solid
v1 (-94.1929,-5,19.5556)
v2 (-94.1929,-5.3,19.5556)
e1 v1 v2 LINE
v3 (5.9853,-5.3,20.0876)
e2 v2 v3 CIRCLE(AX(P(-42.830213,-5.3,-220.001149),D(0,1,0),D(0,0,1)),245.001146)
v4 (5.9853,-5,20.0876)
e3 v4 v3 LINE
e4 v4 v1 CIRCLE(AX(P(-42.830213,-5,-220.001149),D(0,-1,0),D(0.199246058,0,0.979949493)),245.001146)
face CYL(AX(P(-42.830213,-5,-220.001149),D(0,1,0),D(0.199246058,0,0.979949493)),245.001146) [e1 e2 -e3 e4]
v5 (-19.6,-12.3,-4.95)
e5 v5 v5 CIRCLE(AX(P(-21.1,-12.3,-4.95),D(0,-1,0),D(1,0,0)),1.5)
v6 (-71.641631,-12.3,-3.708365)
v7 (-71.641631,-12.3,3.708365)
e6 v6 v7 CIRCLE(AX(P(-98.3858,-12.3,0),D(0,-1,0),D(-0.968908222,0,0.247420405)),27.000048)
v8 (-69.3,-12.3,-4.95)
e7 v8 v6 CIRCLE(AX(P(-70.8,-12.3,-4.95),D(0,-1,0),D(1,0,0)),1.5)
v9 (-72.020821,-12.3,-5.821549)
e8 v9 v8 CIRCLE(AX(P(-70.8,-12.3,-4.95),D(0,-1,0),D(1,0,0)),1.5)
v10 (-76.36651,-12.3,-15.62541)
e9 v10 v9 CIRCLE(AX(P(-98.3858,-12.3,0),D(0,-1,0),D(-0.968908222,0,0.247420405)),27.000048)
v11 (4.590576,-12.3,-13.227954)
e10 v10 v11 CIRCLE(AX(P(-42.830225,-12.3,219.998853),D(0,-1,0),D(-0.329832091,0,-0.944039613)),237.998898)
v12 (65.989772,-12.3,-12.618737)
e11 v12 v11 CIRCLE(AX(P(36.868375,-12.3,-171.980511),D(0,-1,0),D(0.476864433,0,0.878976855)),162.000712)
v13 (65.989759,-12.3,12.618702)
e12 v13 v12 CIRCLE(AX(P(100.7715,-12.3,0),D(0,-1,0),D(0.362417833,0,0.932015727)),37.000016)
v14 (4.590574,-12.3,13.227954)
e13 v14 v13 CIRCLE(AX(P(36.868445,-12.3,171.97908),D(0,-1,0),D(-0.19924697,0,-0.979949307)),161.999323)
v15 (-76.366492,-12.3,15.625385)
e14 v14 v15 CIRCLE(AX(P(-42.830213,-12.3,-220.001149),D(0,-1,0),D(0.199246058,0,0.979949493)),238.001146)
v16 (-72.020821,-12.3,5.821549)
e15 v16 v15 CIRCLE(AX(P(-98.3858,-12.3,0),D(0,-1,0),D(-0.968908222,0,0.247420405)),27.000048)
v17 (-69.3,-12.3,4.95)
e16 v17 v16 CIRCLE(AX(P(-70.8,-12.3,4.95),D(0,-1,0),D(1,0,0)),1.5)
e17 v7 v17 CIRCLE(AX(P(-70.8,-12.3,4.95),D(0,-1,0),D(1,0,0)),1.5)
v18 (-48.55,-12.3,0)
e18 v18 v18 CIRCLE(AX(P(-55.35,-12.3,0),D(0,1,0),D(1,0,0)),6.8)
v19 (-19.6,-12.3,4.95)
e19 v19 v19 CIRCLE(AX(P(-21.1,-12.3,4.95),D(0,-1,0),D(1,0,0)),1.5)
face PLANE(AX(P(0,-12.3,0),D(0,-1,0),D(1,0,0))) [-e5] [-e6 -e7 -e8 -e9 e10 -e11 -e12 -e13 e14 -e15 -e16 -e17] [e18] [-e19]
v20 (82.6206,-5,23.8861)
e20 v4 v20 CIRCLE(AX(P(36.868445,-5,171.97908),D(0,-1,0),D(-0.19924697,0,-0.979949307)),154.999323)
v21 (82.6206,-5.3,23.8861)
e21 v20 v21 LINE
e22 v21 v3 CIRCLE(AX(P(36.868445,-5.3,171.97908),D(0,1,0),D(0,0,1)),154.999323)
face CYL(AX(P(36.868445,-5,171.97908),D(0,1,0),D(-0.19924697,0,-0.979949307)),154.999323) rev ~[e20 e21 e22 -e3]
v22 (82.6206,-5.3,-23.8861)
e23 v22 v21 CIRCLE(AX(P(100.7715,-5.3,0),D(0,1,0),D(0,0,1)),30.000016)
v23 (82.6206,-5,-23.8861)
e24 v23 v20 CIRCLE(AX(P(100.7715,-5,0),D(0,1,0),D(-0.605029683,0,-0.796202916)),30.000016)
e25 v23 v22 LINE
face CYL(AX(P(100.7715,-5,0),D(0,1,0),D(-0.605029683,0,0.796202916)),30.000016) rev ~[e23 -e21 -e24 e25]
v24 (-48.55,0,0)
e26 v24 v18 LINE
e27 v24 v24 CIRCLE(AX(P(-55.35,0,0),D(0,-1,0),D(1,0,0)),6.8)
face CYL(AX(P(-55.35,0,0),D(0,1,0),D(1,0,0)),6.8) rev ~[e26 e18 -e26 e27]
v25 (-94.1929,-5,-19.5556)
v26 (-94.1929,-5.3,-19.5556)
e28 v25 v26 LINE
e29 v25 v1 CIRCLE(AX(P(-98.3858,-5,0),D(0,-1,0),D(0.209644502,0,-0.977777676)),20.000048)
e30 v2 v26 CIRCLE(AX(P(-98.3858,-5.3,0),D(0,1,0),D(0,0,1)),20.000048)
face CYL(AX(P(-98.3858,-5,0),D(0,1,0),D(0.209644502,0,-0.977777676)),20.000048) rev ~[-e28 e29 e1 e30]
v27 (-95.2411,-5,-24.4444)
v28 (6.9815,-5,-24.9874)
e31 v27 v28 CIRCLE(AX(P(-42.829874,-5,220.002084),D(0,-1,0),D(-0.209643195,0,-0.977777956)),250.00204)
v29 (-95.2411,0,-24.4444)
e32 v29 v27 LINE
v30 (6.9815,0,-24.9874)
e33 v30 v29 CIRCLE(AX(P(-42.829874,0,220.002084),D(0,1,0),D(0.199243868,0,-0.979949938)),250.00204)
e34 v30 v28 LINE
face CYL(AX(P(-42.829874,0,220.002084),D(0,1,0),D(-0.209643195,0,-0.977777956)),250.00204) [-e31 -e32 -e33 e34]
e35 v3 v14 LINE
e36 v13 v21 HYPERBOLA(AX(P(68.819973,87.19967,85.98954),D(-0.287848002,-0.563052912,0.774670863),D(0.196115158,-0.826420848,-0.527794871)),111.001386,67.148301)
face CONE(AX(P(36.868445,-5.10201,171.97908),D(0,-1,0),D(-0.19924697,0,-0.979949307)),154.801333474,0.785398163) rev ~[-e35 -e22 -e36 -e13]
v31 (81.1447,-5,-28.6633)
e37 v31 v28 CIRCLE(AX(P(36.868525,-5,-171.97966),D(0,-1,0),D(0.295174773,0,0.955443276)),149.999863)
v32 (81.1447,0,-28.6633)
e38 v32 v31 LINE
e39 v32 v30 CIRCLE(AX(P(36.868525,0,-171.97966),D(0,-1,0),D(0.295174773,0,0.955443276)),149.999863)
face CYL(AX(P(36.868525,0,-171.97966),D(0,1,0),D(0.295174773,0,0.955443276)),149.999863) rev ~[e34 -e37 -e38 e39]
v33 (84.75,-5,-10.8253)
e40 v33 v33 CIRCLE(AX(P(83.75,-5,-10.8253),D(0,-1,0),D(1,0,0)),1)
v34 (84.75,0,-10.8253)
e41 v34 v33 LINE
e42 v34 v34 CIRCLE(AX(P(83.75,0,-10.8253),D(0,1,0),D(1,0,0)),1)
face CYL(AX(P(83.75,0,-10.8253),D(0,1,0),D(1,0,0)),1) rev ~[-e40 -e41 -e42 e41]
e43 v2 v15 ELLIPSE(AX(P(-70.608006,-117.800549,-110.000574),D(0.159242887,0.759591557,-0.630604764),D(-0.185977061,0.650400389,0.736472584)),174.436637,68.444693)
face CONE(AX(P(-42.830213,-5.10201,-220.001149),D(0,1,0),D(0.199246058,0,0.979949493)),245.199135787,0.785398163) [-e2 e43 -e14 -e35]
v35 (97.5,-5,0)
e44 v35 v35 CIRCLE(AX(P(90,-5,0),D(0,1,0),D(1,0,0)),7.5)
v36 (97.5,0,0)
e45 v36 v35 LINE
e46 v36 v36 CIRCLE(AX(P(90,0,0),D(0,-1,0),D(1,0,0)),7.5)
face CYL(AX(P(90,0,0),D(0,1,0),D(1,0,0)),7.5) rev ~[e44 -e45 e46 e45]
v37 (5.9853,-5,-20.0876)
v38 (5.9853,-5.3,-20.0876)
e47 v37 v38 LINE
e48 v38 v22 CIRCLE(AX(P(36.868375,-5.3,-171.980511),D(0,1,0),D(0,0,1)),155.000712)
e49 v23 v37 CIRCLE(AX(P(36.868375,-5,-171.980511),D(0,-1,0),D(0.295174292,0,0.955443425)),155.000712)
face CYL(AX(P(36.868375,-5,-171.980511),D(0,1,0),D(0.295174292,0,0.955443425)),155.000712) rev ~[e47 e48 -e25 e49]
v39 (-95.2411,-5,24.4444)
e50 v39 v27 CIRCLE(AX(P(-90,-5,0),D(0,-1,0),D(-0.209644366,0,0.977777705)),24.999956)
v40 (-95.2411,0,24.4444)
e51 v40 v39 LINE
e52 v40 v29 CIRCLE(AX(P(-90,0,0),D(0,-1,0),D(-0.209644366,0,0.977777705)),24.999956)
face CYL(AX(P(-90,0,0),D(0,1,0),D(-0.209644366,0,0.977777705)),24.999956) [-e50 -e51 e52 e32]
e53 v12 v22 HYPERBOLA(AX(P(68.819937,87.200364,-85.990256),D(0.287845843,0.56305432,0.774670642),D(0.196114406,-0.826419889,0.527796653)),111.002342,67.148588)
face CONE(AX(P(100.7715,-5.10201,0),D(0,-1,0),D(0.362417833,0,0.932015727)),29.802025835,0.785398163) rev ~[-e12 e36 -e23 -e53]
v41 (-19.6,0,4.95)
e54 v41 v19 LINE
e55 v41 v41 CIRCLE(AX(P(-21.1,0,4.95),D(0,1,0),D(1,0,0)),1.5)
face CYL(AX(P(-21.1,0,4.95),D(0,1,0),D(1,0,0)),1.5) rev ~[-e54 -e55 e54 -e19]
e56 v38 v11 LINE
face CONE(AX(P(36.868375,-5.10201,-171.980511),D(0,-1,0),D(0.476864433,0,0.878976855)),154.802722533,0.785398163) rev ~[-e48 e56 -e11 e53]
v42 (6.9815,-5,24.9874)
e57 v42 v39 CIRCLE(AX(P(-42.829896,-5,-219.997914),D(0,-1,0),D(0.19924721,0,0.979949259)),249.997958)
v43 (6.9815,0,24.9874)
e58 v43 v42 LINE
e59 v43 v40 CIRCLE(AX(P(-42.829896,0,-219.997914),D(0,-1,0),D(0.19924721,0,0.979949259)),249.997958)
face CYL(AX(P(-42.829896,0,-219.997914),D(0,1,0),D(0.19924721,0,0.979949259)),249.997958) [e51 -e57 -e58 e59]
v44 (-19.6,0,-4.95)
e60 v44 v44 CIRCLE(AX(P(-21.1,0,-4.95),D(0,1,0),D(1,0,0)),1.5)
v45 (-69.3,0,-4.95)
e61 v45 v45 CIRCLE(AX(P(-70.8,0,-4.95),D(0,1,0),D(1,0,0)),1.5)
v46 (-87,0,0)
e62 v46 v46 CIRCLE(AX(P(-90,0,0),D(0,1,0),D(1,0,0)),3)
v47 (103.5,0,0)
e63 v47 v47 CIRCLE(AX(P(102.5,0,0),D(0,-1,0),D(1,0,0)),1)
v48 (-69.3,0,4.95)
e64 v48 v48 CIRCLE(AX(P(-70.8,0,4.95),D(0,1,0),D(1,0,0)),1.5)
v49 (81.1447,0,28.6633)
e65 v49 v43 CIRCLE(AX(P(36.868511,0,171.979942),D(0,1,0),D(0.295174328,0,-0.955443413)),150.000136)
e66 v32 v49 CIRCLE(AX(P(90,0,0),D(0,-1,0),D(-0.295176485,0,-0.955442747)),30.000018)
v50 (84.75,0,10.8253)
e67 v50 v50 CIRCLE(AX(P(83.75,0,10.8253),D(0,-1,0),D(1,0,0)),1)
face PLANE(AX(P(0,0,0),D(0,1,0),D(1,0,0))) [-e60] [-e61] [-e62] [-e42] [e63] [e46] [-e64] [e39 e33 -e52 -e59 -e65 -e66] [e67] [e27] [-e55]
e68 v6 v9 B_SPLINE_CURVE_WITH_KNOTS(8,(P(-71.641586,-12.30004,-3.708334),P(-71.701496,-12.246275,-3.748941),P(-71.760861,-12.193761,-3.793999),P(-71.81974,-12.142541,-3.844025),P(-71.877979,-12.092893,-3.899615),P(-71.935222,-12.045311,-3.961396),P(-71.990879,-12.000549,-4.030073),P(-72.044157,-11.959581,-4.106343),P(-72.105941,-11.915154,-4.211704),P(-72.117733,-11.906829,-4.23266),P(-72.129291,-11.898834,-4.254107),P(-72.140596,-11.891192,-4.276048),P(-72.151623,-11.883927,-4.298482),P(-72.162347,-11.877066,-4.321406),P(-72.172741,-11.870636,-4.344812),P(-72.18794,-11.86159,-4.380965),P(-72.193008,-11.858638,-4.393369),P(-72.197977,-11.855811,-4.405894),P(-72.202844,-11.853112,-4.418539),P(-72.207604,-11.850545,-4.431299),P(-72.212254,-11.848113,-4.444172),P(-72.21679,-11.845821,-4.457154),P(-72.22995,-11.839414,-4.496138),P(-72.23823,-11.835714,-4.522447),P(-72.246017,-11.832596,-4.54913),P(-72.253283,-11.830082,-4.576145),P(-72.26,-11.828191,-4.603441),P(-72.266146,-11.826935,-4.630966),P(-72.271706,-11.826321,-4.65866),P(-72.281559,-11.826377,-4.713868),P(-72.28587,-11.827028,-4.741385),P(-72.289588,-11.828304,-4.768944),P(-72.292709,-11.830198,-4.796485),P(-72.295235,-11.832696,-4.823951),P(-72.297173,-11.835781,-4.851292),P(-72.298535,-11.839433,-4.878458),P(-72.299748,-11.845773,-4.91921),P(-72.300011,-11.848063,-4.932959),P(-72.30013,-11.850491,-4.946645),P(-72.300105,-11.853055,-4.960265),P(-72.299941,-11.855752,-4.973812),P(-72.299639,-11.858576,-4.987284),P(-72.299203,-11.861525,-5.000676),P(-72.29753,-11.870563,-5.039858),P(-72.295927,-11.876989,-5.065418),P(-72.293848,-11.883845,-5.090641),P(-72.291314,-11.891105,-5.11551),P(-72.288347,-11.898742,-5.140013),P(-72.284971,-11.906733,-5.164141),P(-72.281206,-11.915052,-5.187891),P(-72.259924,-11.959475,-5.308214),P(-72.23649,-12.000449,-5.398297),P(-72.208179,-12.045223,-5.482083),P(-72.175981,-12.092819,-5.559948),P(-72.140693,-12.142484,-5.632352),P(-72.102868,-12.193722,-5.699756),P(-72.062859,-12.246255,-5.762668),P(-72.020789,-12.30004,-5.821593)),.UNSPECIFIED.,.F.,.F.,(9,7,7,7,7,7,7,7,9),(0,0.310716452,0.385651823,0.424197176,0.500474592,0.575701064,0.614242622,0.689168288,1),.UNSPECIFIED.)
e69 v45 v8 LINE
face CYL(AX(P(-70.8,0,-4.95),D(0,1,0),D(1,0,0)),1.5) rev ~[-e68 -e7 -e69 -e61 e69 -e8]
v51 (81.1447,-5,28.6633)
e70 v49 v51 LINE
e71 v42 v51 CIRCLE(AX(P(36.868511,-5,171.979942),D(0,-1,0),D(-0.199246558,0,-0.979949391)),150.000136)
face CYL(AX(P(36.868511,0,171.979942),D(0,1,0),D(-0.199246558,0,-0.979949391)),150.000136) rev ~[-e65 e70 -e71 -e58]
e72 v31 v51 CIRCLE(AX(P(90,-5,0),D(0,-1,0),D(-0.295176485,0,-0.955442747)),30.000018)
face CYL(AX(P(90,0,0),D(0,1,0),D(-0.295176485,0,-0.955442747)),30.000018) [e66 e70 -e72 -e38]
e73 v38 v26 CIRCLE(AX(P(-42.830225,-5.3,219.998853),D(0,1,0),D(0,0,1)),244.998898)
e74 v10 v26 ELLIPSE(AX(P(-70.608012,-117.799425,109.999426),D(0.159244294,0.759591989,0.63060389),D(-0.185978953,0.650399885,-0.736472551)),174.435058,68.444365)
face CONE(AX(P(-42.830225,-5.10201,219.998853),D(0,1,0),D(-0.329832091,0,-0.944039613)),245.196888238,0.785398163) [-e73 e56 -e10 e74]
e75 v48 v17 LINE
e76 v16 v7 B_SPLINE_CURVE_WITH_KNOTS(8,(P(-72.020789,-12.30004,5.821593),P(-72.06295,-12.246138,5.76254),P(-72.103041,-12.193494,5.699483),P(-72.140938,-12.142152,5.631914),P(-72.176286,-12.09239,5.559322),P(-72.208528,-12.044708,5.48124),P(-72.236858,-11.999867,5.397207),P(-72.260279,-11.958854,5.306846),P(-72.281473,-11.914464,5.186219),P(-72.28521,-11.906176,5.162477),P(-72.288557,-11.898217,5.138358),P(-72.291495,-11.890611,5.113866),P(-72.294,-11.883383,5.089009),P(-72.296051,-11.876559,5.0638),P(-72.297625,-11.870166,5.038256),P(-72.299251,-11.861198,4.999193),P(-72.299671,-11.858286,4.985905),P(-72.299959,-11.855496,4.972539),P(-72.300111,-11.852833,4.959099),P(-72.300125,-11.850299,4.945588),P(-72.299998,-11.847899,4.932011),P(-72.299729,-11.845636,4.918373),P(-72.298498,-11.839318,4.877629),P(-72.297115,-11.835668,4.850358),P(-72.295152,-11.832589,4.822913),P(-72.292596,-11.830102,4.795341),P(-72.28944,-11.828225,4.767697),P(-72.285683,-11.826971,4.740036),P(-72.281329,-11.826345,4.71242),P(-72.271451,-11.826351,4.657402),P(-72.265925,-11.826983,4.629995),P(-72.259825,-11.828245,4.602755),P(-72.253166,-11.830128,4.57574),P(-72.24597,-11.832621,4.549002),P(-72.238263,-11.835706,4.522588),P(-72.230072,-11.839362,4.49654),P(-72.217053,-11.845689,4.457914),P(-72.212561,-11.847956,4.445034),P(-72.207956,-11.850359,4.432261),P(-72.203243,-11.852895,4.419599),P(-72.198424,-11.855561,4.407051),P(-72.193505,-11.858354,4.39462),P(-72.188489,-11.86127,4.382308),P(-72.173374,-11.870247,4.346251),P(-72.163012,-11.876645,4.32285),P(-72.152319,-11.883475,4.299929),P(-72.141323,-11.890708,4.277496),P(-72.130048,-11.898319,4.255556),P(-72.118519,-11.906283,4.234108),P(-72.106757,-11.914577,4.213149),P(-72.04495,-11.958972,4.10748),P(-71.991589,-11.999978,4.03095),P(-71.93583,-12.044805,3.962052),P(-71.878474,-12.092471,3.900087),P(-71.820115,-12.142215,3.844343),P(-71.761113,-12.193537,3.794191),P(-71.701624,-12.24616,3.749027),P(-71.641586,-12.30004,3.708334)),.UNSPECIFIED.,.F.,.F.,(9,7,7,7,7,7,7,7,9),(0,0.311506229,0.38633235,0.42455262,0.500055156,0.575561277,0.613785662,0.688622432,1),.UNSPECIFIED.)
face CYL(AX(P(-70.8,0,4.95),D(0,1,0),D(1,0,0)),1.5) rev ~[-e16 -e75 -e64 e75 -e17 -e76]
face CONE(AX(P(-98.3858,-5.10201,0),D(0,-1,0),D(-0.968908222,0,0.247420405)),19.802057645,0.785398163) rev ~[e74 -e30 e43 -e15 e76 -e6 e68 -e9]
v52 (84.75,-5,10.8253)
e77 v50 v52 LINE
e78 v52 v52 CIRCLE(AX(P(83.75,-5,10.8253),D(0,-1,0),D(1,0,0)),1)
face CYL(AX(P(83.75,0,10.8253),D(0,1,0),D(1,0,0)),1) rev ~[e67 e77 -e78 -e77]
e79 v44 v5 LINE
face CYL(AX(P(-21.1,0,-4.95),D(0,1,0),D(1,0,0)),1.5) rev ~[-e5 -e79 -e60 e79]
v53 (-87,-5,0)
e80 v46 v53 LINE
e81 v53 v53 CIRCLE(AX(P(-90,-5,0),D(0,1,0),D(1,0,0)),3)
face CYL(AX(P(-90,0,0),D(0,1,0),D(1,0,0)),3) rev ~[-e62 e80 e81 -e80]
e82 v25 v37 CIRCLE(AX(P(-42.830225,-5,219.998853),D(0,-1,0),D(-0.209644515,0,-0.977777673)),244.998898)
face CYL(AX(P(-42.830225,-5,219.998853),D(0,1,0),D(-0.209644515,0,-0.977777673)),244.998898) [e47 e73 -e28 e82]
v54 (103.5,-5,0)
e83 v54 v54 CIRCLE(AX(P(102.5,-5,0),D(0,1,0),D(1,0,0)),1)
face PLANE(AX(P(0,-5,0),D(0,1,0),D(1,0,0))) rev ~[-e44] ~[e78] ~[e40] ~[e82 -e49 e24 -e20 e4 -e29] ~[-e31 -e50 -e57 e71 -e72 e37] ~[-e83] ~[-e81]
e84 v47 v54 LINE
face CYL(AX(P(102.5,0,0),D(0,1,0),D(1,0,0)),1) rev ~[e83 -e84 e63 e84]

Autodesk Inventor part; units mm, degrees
ref_plane "YZ Plane" through (0, 0, 0) normal (1, 0, 0) x (0, 1, 0)
ref_plane "XZ Plane" through (0, 0, 0) normal (0, 1, 0) x (-1, 0, 0)
ref_plane "XY Plane" through (0, 0, 0) normal (0, 0, 1) x (1, 0, 0)
sketch "Sketch1" plane through (0, 0, 0) normal (0, 1, 0) x (-1, 0, 0)
  line L0 (-90, -25) -> (90, -25)
  line L1 (90, -25) -> (90, 25)
  line L2 (90, 25) -> (-90, 25)
  line L3 (-90, 25) -> (-90, -25)
  line L4 (-90, -25) -> (90, 25) construction
  line L5 (90, -25) -> (-90, 25) construction
  circle A0 centre (90, 0) radius 25
  circle A1 centre (-90, 0) radius 25
  point P0 (0, 0)
  dimension "d0" = 180
  dimension "d1" = 50
extrude "Extrusion1" add sketch "Sketch1" along normal blind 5
sketch "Sketch2" plane through (0, 5, 0) normal (0, 1, 0) x (1, 0, 0)
  arc A0 (90, -25) -> (90, 25) centre (90, 0) ccw projected
  arc A1 (-90, 25) -> (-90, -25) centre (-90, 0) ccw projected
  circle A2 centre (-90, 0) radius 7.5
  circle A3 centre (90, 0) radius 7.5
  point P0 (0, 0)
  dimension "d4" = 15
  dimension "d5" = 15
extrude "Extrusion2" cut sketch "Sketch2" against normal blind 5
sketch "Sketch3" plane through (0, 0, 0) normal (0, -1, 0) x (1, 0, 0)
  line L0 (-90, 25) -> (90, 25) projected
  arc A0 (-90, 25) -> (-90, -25) centre (-90, 0) ccw projected
  line L1 (-90, 0) -> (-55.35, 0)
  circle A1 centre (-55.35, 0) radius 17.325
  line L2 (-55.35, 0) -> (-73.45, 0)
  line L3 (-73.45, 0) -> (-18.45, 0)
  line L4 (-18.45, 10) -> (-73.45, 10)
  line L5 (-73.45, 10) -> (-73.45, -10)
  line L6 (-73.45, -10) -> (-18.45, -10)
  line L7 (-18.45, -10) -> (-18.45, 10)
  line L8 (-18.45, 10) -> (-73.45, -10) construction
  line L9 (-73.45, 10) -> (-18.45, -10) construction
  line L10 (-25.85, -10) -> (-25.85, 10)
  line L11 (-25.85, 10) -> (-66.05, -10) construction
  line L12 (-66.05, 10) -> (-25.85, -10) construction
  line L13 (-70.8, 4.95) -> (-70.8, -4.95)
  line L14 (-70.8, -4.95) -> (-61.3, -4.95)
  line L15 (-61.3, -4.95) -> (-61.3, 4.95)
  line L16 (-61.3, 4.95) -> (-70.8, -4.95) construction
  line L17 (-70.8, 4.95) -> (-61.3, -4.95) construction
  line L18 (-21.1, 4.95) -> (-30.6, 4.95)
  line L19 (-30.6, 4.95) -> (-30.6, -4.95)
  line L20 (-30.6, -4.95) -> (-21.1, -4.95)
  line L21 (-21.1, -4.95) -> (-21.1, 4.95)
  line L22 (-21.1, 4.95) -> (-30.6, -4.95) construction
  line L23 (-30.6, 4.95) -> (-21.1, -4.95) construction
  circle A2 centre (-70.8, 4.95) radius 1.5
  circle A3 centre (-70.8, -4.95) radius 1.5
  circle A4 centre (-21.1, -4.95) radius 1.5
  circle A5 centre (-21.1, 4.95) radius 1.5
  circle A6 centre (-55.35, 0) radius 6.8
  point P0 (0, 0)
  point P1 (-45.95, 0)
  point P2 (-45.95, 0)
  point P3 (-66.05, 0)
  point P4 (-25.85, 0)
  dimension "d9" = 34.65
  dimension "d10" = 18.1
  dimension "d11" = 55
  dimension "d12" = 20
  dimension "d13" = 40.2
  dimension "d14" = 9.5
  dimension "d15" = 9.9
  dimension "d16" = 9.5
  dimension "d17" = 9.9
  dimension "d18" = 3
  dimension "d19" = 3
  dimension "d20" = 3
  dimension "d21" = 3
  dimension "d22" = 13.6
extrude "Extrusion3" cut sketch "Sketch3" against normal blind 5 contours A2 A1 | A1 A2 | A3 L13 L14 A1 | A1 A3 | A6 L15 L1 | L1 L15 A6 | A3 L14 L13 | L15 A6 L3 L1 | L1 L3 A6 L15 | A5 L21 L18 | L18 L21 A5 | A4 L21 L20 | L20 L21 A4
sketch "Sketch4" plane through (0, 0, 0) normal (0, -1, 0) x (1, 0, 0)
  circle A0 centre (90, 0) radius 7.5 projected
  arc A1 (90, -25) -> (90, 25) centre (90, 0) ccw projected
  line L0 (-90, 25) -> (90, 25) projected
  circle A2 centre (90, 0) radius 17.5
  line L1 (82.5, 0) -> (72.5, 0)
  line L2 (97.5, 0) -> (107.5, 0)
  circle A3 centre (102.5, 0) radius 1
  line L3 (90, 0) -> (107.5, 0) construction
  line L4 (90, 0) -> (81.25, -15.1554)
  line L5 (90, 0) -> (107.5, 0) construction
  circle A4 centre (83.75, 10.8253) radius 1
  circle A5 centre (83.75, -10.8253) radius 1
  point P0 (0, 0)
  dimension "d26" = 2
  dimension "d29" = 2
  dimension "d30" = 2
extrude "Extrusion4" cut sketch "Sketch4" against normal blind 5 contours A3 L2 | L2 A3 | A5 L4 | L4 A5 | A4
sketch "Sketch5" plane through (0, 0, 0) normal (0, -1, 0) x (1, 0, 0)
  circle A0 centre (83.75, 10.8253) radius 1 projected
  circle A1 centre (102.5, 0) radius 1 projected
  circle A2 centre (83.75, -10.8253) radius 1 projected
  circle A3 centre (-21.1, 4.95) radius 1.5 projected
  circle A4 centre (-70.8, -4.95) radius 1.5 projected
  circle A5 centre (-55.35, 0) radius 6.8 projected
  circle A6 centre (-70.8, 4.95) radius 1.5 projected
  circle A7 centre (-21.1, -4.95) radius 1.5 projected
  circle A8 centre (-90, 0) radius 7.5 projected
  circle A9 centre (90, 0) radius 7.5 projected
  line L0 (-55.35, 0) -> (0, 0)
  arc A10 (6.9815, 24.9874) -> (-95.2411, 24.4444) centre (-42.8301, -220) ccw
  arc A11 (6.9815, 24.9874) -> (81.1447, 28.6633) centre (36.8685, 171.9798) ccw
  line L1 (-115, 0) -> (115, 0)
  arc A12 (-95.2411, -24.4444) -> (6.9815, -24.9874) centre (-42.8301, 220) ccw
  arc A13 (81.1447, -28.6633) -> (6.9815, -24.9874) centre (36.8685, -171.9798) ccw
  arc A14 (-95.2411, 24.4444) -> (-95.2411, -24.4444) centre (-90, 0) ccw
  arc A15 (81.1447, -28.6633) -> (81.1447, 28.6633) centre (90, 0) ccw construction
  arc A16 (-95.2411, 24.4444) -> (-95.2411, -24.4444) centre (-90, 0) ccw
  arc A17 (81.1447, -28.6633) -> (81.1447, 28.6633) centre (90, 0) ccw
extrude "Extrusion5" add sketch "Sketch5" along normal blind 5
sketch "Sketch6" plane through (0, 5, 0) normal (0, 1, 0) x (1, 0, 0)
  circle A0 centre (83.75, -10.8253) radius 1 projected
  circle A1 centre (102.5, 0) radius 1 projected
  circle A2 centre (83.75, 10.8253) radius 1 projected
  circle A3 centre (-21.1, -4.95) radius 1.5 projected
  circle A4 centre (-70.8, 4.95) radius 1.5 projected
  circle A5 centre (-55.35, 0) radius 6.8 projected
  circle A6 centre (-70.8, -4.95) radius 1.5 projected
  circle A7 centre (-21.1, 4.95) radius 1.5 projected
  circle A8 centre (-90, 0) radius 7.5 projected
  circle A9 centre (90, 0) radius 7.5 projected
  line L0 (-90, -25) -> (90, -25) projected
  arc A10 (90, -25) -> (90, 25) centre (90, 0) ccw projected
  line L1 (90, 25) -> (-90, 25) projected
  arc A11 (-90, 25) -> (-90, -25) centre (-90, 0) ccw projected
  point P0 (0, 0)
extrude "Extrusion6" cut sketch "Sketch6" against normal blind 5
sketch "Sketch8" plane through (0, -5, 0) normal (0, -1, 0) x (1, 0, 0)
  circle A0 centre (-55.35, 0) radius 6.8 projected
  circle A1 centre (-21.1, -4.95) radius 1.5 projected
  circle A2 centre (-70.8, 4.95) radius 1.5 projected
  circle A3 centre (-70.8, -4.95) radius 1.5 projected
  circle A4 centre (-21.1, 4.95) radius 1.5 projected
  arc A5 (-95.2411, 24.4444) -> (-95.2411, -24.4444) centre (-90, 0) ccw projected
  arc A6 (81.1447, -28.6633) -> (81.1447, 28.6633) centre (90, 0) ccw projected
  arc A7 (5.9853, 20.0876) -> (-94.1929, 19.5556) centre (-42.8301, -220) ccw
  arc A8 (5.9853, 20.0876) -> (82.6206, 23.8861) centre (36.8685, 171.9798) ccw
  line L0 (-90, 0) -> (90, 0)
  arc A9 (-94.1929, -19.5556) -> (5.9853, -20.0876) centre (-42.8301, 220) ccw
  arc A10 (82.6206, -23.8861) -> (5.9853, -20.0876) centre (36.8685, -171.9798) ccw
  arc A11 (-94.1929, -19.5556) -> (-94.1929, 19.5556) centre (-98.3858, 0) ccw
  arc A12 (82.6206, 23.8861) -> (82.6206, -23.8861) centre (100.7715, 0) ccw
  point P0 (0, 0)
  dimension "d72" = 20
  dimension "d73" = 30
extrude "Extrusion7" add sketch "Sketch8" along normal blind 7.3 contours L0 A12 A10 A9 A11 A0 | A0 L0 A11 A7 A8 A12
sketch "Sketch14" plane through (0, 0, 0) normal (0, 1, 0) x (1, 0, 0)
  circle A0 centre (-90, 0) radius 7.5 projected
  arc A1 (-95.2411, 24.4444) -> (-95.2411, -24.4444) centre (-90, 0) ccw projected
  circle A2 centre (-90, 0) radius 3
  point P0 (0, 0)
  dimension "d103" = 6
extrude "Extrusion13" add sketch "Sketch14" against normal blind 5
chamfer "Chamfer2" distance 7 angle 45 6 edges at (-44.1313, -12.3, 24.9965) (44.5417, -12.3, 17.1698) (70.7715, -12.3, 0) (44.5417, -12.3, -17.1698) (-44.1313, -12.3, -24.9965) (-78.3858, -12.3, 0)
properties part number "rameno(b)dole"
